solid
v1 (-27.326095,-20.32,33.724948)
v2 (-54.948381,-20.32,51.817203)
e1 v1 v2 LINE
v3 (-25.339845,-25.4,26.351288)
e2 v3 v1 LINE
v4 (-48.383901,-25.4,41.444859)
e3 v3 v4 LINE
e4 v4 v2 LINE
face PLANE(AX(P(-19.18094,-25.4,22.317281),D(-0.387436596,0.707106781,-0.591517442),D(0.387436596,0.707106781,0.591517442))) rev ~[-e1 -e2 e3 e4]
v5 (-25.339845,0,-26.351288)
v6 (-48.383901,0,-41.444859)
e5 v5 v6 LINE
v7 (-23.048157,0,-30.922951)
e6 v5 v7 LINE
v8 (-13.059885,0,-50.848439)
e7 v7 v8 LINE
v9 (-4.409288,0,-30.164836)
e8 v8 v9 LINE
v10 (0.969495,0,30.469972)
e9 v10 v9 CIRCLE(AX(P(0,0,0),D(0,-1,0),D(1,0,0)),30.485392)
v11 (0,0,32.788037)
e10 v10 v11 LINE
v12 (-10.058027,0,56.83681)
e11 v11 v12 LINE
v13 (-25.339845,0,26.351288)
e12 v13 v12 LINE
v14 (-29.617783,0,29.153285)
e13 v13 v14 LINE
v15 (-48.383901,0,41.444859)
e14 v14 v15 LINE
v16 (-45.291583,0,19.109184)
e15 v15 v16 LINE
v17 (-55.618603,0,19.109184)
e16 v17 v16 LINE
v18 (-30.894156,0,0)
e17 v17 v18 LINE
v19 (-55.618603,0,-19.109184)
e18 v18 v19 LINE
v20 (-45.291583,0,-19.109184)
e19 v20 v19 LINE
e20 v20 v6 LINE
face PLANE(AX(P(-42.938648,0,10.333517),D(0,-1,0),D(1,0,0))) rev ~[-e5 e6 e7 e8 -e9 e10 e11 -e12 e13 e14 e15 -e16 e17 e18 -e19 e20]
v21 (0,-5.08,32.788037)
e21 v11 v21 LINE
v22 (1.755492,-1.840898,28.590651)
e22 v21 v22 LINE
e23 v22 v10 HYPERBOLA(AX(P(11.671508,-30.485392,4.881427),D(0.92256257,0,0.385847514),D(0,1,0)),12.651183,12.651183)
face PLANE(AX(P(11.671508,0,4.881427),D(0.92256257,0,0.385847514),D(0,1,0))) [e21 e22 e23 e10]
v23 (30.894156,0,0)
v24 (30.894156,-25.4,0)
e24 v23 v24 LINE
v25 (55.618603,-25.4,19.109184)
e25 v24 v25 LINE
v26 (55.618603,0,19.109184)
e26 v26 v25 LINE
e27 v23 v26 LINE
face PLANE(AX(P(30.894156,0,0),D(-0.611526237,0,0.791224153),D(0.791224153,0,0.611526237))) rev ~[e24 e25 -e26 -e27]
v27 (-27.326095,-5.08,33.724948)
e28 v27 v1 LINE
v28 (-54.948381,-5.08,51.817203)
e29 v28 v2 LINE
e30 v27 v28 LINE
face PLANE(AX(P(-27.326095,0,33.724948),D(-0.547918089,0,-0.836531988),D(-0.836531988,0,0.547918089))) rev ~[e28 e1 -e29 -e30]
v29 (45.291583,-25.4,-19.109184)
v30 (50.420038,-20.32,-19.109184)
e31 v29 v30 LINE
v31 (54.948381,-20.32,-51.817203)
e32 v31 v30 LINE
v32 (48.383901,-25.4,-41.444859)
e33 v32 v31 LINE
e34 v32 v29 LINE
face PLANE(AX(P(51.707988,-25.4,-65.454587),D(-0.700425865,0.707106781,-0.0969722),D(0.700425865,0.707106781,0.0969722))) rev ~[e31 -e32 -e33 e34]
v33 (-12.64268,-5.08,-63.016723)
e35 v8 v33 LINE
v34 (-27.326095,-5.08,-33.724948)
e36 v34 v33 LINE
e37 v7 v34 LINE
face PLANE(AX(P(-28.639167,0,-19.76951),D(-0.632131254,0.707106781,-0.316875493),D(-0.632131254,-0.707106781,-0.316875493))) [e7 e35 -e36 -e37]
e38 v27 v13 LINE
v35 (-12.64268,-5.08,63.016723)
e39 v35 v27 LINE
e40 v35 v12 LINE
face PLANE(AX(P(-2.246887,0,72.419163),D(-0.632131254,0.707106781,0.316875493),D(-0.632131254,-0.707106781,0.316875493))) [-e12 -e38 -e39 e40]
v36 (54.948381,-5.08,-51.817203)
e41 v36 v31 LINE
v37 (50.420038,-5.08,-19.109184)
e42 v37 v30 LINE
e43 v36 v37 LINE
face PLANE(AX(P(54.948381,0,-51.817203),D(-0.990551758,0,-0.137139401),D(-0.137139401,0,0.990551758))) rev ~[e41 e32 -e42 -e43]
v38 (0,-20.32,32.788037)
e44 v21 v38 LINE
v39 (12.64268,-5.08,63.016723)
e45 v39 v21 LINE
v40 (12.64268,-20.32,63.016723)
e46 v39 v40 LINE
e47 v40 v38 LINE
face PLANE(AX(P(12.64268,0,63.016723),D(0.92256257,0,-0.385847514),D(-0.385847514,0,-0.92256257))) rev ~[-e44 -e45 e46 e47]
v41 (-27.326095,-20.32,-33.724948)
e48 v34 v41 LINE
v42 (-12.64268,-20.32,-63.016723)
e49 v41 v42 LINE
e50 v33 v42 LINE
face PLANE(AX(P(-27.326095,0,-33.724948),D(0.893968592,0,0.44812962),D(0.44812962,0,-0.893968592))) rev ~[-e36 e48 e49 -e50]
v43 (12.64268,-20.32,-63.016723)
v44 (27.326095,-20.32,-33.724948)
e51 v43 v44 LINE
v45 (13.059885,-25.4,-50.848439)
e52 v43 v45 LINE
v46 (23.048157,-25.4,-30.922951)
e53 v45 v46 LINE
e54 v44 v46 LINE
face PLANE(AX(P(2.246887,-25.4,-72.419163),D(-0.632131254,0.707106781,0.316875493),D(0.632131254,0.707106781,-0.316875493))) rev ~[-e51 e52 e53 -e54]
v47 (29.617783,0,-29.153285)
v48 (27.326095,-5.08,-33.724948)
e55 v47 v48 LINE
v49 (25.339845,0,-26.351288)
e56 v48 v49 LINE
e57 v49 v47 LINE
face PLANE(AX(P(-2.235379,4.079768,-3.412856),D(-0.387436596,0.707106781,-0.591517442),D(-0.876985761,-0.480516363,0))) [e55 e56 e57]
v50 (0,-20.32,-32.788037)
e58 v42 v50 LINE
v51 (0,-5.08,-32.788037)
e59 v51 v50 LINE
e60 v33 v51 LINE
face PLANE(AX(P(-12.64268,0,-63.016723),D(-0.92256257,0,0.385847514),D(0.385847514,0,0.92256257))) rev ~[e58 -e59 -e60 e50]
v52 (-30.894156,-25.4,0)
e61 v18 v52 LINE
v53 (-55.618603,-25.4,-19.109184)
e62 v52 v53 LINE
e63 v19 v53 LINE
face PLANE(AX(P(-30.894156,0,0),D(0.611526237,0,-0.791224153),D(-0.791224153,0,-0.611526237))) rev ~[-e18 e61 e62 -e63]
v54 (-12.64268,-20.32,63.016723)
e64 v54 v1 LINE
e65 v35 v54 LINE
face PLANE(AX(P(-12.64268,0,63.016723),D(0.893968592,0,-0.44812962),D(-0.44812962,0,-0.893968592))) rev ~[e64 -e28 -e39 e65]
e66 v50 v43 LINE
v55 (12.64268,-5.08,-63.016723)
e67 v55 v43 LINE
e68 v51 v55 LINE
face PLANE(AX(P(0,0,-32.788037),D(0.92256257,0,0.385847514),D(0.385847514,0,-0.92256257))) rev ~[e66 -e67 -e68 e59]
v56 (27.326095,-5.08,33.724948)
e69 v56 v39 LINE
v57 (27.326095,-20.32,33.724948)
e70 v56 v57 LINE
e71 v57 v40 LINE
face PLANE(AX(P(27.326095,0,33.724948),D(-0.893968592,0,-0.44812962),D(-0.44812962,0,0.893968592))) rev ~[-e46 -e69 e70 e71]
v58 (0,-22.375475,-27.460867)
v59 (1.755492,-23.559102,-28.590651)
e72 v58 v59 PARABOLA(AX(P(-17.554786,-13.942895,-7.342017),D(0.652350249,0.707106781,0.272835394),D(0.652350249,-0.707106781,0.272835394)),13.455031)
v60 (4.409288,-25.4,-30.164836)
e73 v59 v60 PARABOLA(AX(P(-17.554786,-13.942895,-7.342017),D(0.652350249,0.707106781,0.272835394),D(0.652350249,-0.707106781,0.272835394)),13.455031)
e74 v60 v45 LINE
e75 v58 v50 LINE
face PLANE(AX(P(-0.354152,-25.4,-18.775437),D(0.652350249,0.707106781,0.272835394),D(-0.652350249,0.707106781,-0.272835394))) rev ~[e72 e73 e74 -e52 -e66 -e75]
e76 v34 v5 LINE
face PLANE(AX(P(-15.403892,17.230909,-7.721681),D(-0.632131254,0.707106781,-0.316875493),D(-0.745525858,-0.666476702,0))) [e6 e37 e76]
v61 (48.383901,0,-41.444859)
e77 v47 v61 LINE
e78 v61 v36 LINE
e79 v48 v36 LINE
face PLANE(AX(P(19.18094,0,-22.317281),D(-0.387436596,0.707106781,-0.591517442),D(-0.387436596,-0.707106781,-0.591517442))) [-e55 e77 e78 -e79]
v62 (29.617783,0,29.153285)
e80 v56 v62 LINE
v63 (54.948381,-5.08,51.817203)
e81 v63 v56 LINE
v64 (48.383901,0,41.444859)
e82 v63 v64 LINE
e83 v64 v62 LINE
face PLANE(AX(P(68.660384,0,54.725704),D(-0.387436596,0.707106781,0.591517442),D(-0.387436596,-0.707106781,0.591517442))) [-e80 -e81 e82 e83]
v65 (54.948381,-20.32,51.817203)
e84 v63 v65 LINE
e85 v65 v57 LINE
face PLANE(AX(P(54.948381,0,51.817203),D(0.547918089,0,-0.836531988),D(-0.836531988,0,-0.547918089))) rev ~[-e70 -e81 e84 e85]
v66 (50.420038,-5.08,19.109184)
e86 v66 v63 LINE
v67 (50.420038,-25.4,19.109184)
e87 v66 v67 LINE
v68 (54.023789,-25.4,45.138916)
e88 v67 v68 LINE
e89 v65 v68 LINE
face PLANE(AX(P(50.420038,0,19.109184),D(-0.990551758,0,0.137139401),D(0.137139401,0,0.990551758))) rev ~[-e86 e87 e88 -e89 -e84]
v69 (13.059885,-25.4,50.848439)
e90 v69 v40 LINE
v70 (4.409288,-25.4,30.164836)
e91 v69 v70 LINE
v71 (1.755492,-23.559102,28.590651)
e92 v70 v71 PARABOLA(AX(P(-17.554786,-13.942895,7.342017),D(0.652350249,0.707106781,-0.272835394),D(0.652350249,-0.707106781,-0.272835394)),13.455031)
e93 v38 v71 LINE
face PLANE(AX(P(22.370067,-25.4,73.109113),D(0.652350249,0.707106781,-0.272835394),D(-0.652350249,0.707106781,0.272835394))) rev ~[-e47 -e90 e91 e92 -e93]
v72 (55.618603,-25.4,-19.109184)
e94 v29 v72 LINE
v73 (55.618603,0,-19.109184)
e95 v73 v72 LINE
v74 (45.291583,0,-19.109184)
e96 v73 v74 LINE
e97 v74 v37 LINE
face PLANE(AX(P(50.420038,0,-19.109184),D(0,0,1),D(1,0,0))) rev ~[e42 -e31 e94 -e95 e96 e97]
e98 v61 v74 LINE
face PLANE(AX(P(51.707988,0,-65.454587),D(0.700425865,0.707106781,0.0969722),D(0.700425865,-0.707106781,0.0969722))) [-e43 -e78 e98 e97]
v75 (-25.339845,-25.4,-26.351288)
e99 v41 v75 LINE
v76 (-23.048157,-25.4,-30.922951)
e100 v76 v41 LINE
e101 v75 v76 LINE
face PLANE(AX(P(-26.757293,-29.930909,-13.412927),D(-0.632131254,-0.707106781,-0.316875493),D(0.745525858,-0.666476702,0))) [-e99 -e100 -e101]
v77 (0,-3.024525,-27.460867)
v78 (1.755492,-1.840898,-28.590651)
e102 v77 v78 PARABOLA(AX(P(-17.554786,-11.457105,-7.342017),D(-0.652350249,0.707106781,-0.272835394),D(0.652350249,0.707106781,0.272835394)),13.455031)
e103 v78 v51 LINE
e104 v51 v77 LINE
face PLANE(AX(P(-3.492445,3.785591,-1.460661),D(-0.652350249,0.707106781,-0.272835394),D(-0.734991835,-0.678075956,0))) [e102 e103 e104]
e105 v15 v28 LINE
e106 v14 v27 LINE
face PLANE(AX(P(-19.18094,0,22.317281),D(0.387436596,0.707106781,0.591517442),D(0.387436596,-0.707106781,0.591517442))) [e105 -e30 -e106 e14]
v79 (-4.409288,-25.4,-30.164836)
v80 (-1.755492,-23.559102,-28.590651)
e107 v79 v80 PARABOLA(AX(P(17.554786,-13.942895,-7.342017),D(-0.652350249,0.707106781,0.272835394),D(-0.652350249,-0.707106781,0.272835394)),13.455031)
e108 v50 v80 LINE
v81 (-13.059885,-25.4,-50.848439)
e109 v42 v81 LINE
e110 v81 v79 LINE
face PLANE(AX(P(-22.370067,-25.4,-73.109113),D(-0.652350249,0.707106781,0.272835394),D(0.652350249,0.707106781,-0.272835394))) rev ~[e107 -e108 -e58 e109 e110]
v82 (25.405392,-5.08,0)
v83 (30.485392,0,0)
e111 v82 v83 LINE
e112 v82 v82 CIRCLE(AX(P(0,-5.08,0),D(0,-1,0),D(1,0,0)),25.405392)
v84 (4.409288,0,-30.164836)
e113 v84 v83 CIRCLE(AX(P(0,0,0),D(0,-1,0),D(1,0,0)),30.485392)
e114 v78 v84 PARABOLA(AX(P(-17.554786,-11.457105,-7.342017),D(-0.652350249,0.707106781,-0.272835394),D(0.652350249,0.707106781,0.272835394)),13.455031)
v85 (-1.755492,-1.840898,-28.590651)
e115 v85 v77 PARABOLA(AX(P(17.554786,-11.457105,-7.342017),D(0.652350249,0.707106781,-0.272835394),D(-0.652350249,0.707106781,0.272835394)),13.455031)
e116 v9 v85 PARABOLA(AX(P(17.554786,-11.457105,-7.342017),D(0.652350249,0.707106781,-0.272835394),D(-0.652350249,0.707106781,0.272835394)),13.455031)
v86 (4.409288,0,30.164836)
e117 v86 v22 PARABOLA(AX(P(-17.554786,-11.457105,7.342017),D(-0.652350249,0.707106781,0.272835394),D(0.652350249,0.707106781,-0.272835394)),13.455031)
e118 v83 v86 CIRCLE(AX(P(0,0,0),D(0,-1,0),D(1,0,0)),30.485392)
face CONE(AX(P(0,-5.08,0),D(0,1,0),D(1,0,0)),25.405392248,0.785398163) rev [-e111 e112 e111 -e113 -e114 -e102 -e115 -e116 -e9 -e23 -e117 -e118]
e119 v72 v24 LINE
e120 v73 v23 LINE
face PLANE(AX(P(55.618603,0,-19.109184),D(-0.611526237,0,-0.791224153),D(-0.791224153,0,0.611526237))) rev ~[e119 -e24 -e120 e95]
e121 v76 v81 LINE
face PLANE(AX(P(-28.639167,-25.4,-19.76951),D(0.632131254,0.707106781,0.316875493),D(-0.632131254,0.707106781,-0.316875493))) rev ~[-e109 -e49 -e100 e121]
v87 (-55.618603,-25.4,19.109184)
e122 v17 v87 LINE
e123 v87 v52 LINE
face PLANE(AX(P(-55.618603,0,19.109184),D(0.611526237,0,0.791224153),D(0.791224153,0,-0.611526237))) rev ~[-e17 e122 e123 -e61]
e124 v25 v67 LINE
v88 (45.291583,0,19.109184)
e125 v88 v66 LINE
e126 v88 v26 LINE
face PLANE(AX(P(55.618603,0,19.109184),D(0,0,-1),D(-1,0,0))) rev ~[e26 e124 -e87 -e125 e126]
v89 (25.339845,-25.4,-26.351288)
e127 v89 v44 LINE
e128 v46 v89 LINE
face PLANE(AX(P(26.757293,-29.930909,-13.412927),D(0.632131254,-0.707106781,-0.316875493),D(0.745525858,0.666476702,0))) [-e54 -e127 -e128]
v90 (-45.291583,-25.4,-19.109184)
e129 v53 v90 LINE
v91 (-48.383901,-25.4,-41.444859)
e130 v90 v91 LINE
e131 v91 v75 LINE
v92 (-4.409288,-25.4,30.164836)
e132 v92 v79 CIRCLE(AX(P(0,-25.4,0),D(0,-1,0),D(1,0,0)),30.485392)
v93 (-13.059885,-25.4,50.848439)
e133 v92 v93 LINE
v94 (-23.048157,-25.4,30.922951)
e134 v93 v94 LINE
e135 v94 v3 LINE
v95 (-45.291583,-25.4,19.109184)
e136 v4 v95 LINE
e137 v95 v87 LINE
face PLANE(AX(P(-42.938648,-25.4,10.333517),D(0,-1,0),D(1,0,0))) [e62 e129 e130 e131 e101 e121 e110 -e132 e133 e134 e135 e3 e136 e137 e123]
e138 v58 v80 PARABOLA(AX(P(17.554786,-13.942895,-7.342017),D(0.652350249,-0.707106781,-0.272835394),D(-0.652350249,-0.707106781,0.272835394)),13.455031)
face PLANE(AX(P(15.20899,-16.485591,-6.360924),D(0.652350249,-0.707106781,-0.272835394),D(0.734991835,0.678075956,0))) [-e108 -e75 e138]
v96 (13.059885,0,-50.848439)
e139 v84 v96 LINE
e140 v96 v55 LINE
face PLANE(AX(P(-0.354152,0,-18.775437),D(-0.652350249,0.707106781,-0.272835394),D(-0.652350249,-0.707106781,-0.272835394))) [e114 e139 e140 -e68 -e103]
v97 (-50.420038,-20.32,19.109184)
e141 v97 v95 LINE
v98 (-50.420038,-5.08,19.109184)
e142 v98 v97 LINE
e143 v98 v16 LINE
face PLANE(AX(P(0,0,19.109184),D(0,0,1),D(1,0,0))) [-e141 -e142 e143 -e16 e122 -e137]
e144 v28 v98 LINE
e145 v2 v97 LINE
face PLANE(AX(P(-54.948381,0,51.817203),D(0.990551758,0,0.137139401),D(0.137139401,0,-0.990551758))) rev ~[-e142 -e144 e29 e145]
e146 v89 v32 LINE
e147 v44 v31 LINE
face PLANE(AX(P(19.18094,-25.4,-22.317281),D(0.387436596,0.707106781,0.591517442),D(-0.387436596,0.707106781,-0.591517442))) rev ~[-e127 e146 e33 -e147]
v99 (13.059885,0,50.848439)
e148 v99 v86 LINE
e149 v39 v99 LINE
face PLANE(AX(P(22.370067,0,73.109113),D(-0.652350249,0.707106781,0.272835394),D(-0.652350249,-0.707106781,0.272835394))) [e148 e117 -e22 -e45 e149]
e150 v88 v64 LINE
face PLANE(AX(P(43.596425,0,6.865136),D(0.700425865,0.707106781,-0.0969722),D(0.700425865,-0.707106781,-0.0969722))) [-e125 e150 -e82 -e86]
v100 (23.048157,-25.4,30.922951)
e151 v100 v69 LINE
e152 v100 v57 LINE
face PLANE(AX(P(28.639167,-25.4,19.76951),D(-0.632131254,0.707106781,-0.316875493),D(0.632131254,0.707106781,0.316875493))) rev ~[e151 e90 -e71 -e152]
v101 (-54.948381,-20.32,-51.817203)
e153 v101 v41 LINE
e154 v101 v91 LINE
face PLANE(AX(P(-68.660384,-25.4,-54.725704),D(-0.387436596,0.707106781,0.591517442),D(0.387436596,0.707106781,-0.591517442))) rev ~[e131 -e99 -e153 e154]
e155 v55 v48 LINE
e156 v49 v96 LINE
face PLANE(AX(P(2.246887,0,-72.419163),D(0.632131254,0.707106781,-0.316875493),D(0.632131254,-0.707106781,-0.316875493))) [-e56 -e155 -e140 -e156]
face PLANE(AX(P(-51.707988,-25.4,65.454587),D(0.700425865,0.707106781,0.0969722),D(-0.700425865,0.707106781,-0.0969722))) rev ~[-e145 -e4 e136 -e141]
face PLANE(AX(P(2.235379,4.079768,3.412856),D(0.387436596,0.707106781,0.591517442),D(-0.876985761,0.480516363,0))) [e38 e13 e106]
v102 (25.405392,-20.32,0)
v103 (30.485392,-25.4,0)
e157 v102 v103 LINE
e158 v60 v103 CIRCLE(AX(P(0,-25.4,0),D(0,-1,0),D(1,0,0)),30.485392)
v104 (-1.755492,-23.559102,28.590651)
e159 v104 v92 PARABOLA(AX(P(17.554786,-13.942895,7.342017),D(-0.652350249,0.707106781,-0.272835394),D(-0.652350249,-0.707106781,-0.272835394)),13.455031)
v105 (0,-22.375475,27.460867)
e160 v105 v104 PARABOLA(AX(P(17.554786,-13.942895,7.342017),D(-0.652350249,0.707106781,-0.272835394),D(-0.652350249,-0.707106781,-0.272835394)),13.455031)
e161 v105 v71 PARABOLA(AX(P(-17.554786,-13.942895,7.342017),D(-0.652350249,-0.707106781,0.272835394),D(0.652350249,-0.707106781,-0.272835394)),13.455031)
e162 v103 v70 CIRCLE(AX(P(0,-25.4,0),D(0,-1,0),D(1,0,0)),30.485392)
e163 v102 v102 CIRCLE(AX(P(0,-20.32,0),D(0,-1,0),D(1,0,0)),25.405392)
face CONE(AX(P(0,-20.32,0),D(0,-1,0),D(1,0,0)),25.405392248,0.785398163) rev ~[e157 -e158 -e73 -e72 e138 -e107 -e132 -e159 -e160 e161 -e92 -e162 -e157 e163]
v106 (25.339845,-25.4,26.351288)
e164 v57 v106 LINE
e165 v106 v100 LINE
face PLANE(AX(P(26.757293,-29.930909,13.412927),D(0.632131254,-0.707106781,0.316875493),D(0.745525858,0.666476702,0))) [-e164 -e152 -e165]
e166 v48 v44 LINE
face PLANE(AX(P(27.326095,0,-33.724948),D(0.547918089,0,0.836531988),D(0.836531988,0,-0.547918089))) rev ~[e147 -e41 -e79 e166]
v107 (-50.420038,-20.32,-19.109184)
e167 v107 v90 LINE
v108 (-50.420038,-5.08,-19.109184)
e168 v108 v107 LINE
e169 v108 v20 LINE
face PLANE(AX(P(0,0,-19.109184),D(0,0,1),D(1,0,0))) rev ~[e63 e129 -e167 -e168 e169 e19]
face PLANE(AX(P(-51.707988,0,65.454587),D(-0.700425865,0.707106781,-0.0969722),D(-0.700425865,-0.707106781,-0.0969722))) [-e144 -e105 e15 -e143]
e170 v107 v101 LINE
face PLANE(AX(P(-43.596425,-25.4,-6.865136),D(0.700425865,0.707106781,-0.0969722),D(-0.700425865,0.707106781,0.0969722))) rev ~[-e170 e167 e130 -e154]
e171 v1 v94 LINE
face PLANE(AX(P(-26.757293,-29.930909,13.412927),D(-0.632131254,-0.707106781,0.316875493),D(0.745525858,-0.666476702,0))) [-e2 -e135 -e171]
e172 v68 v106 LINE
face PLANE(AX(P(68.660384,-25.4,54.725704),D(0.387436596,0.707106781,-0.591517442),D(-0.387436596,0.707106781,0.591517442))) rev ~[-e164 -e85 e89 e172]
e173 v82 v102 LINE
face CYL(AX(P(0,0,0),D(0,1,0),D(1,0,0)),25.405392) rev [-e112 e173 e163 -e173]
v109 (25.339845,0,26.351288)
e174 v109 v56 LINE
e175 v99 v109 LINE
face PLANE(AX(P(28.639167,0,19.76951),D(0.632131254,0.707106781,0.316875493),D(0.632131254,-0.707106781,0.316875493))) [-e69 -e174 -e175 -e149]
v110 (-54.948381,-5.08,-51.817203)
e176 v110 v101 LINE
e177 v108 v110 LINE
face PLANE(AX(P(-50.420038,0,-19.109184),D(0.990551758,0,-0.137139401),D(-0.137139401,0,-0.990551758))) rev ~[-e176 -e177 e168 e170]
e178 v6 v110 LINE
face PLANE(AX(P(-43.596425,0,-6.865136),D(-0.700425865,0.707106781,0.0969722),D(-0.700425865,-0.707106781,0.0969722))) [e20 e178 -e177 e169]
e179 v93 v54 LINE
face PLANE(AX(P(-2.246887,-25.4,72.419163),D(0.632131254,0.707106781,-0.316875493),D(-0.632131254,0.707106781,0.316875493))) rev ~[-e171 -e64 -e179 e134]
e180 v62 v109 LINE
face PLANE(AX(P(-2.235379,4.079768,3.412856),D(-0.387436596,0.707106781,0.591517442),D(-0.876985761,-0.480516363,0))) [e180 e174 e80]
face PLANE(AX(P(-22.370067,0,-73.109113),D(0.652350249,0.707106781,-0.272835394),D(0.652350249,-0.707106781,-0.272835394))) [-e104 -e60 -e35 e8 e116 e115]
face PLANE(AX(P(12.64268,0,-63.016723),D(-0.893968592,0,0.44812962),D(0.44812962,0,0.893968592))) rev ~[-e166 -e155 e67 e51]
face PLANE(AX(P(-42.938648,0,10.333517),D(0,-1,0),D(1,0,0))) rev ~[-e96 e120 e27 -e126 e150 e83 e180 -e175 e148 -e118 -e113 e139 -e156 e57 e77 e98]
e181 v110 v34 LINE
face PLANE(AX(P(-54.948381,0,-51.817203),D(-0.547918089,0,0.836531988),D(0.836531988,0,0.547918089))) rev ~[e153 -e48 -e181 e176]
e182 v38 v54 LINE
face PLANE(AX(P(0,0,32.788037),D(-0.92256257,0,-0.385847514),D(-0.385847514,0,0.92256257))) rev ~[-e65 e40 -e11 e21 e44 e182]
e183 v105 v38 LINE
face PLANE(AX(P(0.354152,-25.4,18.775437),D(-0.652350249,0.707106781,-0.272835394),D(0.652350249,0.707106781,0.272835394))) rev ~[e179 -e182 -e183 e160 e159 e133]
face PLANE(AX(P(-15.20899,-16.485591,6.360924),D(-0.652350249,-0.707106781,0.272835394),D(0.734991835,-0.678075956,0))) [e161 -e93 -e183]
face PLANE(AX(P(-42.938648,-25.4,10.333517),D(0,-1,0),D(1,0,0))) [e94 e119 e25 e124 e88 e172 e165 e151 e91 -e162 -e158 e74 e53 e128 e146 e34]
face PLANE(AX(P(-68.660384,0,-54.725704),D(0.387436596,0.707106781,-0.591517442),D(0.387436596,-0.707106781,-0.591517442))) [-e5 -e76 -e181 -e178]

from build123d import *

# Parameters (mm, degrees)
F0_R          = 25.4053922475
F1_DEPTH      = 25.4
F2_SIZE       = 5.08
F3_T4_DEPTH   = 58.8942991577
F3_T9_DEPTH   = 59.1482991577
F3_T14_DEPTH  = 59.1482991577
F3_T19_DEPTH  = 59.1482991577
F3_T24_DEPTH  = 59.1482991577
F3_T29_DEPTH  = 58.8942991577
F3_T34_DEPTH  = 58.8942991577
F3_T39_DEPTH  = 58.8942991577
F3_T44_DEPTH  = 58.8942991577
F3_T49_DEPTH  = 59.1482991577
F3_T54_DEPTH  = 59.1482991577
F3_T59_DEPTH  = 58.8942991577
F3_T64_DEPTH  = 58.8942991577
F3_T69_DEPTH  = 59.1482991577
F3_T74_DEPTH  = 59.1482991577
F3_T79_DEPTH  = 59.1482991577
F3_T84_DEPTH  = 59.1482991577
F3_T89_DEPTH  = 58.8942991577
F3_T94_DEPTH  = 58.8942991577
F3_T99_DEPTH  = 58.8942991577
F3_T104_DEPTH = 59.1482991577
F3_T109_DEPTH = 59.1482991577
F3_T114_DEPTH = 59.1482991577
F3_T119_DEPTH = 58.8942991577
F3_T124_DEPTH = 59.1482991577
F3_T129_DEPTH = 59.1482991577
F3_T134_DEPTH = 58.8942991577
F3_T139_DEPTH = 58.8942991577
F3_T144_DEPTH = 58.8942991577
F3_T149_DEPTH = 58.8942991577


# Not quite as in the source:
# - a fillet or chamfer that OpenCascade refuses, or shapes differently, is made with other operations: its cross-section is extruded or revolved along the edge and cut away or added


with BuildPart() as f1:
    # F0 (on Front) → F1 (new body)
    with BuildSketch(Plane.XZ):
        Polygon((-55.6186027825, 19.1091839224), (-30.8941560641, 0), (-50.4200380058, 19.1091839224), align=None)
        Polygon((-54.9483810148, 51.8172029635), (-50.4200380058, 19.1091839224), (-27.3260947604, 33.7249476569), align=None)
        Polygon((-12.64267964, 63.0167225502), (-27.3260947604, 33.7249476569), (0, 32.7880373733), align=None)
        Polygon((12.64267964, 63.0167225502), (0, 32.7880373733), (27.3260947604, 33.7249476569), align=None)
        Polygon((54.9483810148, 51.8172029635), (27.3260947604, 33.7249476569), (50.4200380058, 19.1091839224), align=None)
        Polygon((55.6186027825, 19.1091839224), (50.4200380058, 19.1091839224), (30.8941560641, 0), align=None)
        Polygon((0, -32.7880373733), (-27.3260947604, -33.7249476569), (-12.64267964, -63.0167225502), align=None)
        Polygon((-27.3260947604, -33.7249476569), (-50.4200380058, -19.1091839224), (-54.9483810148, -51.8172029635), align=None)
        Polygon((-50.4200380058, -19.1091839224), (-30.8941560641, 0), (-55.6186027825, -19.1091839224), align=None)
        Polygon((27.3260947604, -33.7249476569), (0, -32.7880373733), (12.64267964, -63.0167225502), align=None)
        Polygon((50.4200380058, -19.1091839224), (27.3260947604, -33.7249476569), (54.9483810148, -51.8172029635), align=None)
        Polygon((30.8941560641, 0), (50.4200380058, -19.1091839224), (55.6186027825, -19.1091839224), align=None)
        Polygon((-50.4200380058, 19.1091839224), (-30.8941560641, 0), (-50.4200380058, -19.1091839224), (-27.3260947604, -33.7249476569), (0, -32.7880373733), (27.3260947604, -33.7249476569), (50.4200380058, -19.1091839224), (30.8941560641, 0), (50.4200380058, 19.1091839224), (27.3260947604, 33.7249476569), (0, 32.7880373733), (-27.3260947604, 33.7249476569), align=None)
        Circle(F0_R, mode=Mode.SUBTRACT)
    extrude(amount=F1_DEPTH)

    # F2
    f2_edges = [f1.edges().sort_by_distance(p)[0] for p in [
        (-25.405392, 0, 0),
        (-25.405392, -25.4, 0),
    ]]
    chamfer(f2_edges, length=F2_SIZE)

    # F3: chamfer of 5.08 on 30 edges, made by hand


with BuildPart() as f3_tool2:
    # F3_s3 → F3_t4 (new body)
    with BuildSketch(Plane(origin=(28.5608965027, 0, 56.9758018995), x_dir=(0, 1, 0), z_dir=(-0.4481296197, 0, -0.8939685922))):
        Polygon((0, -34.4618184336), (-5.08, -39.5418184336), (0, -39.5418184336), align=None)
    extrude(amount=F3_T4_DEPTH)

    split(bisect_by=Plane(origin=(2.2353786575, 4.079767946, 3.4128563917), x_dir=(-0.8769857612, 0.4805163626, 0), z_dir=(0.3874365964, 0.7071067812, 0.5915174416)), keep=Keep.TOP)


with BuildPart() as f1_1:
    add(f1.part)

    # F3_t1: cut F3_tool2
    add(f3_tool2.part, mode=Mode.SUBTRACT)


with BuildPart() as f3_tool7:
    # F3_s8 → F3_t9 (new body)
    with BuildSketch(Plane(origin=(-23.6516969458, 0, 15.4915684979), x_dir=(0, 1, 0), z_dir=(-0.8365319883, 0, 0.5479180892))):
        Polygon((0, -8.159535892), (-5.08, -13.239535892), (0, -13.239535892), align=None)
    extrude(amount=F3_T9_DEPTH)

    split(bisect_by=Plane(origin=(-15.4038916556, 17.2309092168, 7.7216807951), x_dir=(-0.7455258584, -0.6664767021, 0), z_dir=(-0.6321312537, 0.7071067812, 0.316875493)), keep=Keep.TOP)


with BuildPart() as f1_2:
    add(f1_1.part)

    # F3_t6: cut F3_tool7
    add(f3_tool7.part, mode=Mode.SUBTRACT)


with BuildPart() as f3_tool12:
    # F3_s13 → F3_t14 (new body)
    with BuildSketch(Plane(origin=(-9.8640749157, 0, 71.247771982), x_dir=(0, 1, 0), z_dir=(0.1371394006, 0, -0.9905517578))):
        Polygon((0, -42.2430352429), (-5.08, -47.3230352429), (0, -47.3230352429), align=None)
    extrude(amount=F3_T14_DEPTH)

    split(bisect_by=Plane.XY.offset(19.1091839224), keep=Keep.TOP)


with BuildPart() as f1_3:
    add(f1_2.part)

    # F3_t11: cut F3_tool12
    add(f3_tool12.part, mode=Mode.SUBTRACT)


with BuildPart() as f3_tool17:
    # F3_s18 → F3_t19 (new body)
    with BuildSketch(Plane(origin=(-1.7525126205, 0, -12.658320283), x_dir=(0, 1, 0), z_dir=(-0.1371394006, 0, -0.9905517578))):
        Polygon((0, -42.2430352429), (-5.08, -47.3230352429), (0, -47.3230352429), align=None)
    extrude(amount=F3_T19_DEPTH)

    split(bisect_by=Plane.XY.offset(-19.1091839224), keep=Keep.BOTTOM)


with BuildPart() as f1_4:
    add(f1_3.part)

    # F3_t16: cut F3_tool17
    add(f3_tool17.part, mode=Mode.SUBTRACT)


with BuildPart() as f3_tool22:
    # F3_s23 → F3_t24 (new body)
    with BuildSketch(Plane(origin=(-73.1311412461, 0, -47.8999915541), x_dir=(0, 1, 0), z_dir=(0.8365319883, 0, 0.5479180892))):
        Polygon((0, -8.159535892), (-5.08, -13.239535892), (0, -13.239535892), align=None)
    extrude(amount=F3_T24_DEPTH)

    split(bisect_by=Plane(origin=(-15.4038916556, 17.2309092168, -7.7216807951), x_dir=(-0.7455258584, -0.6664767021, 0), z_dir=(-0.6321312537, 0.7071067812, -0.316875493)), keep=Keep.TOP)


with BuildPart() as f1_5:
    add(f1_4.part)

    # F3_t21: cut F3_tool22
    add(f3_tool22.part, mode=Mode.SUBTRACT)


with BuildPart() as f3_tool27:
    # F3_s28 → F3_t29 (new body)
    with BuildSketch(Plane(origin=(2.1686166163, 0, -4.3261481905), x_dir=(0, 1, 0), z_dir=(0.4481296197, 0, -0.8939685922))):
        Polygon((0, -34.4618184336), (-5.08, -39.5418184336), (0, -39.5418184336), align=None)
    extrude(amount=F3_T29_DEPTH)

    split(bisect_by=Plane(origin=(2.2353786575, 4.079767946, -3.4128563917), x_dir=(-0.8769857612, 0.4805163626, 0), z_dir=(0.3874365964, 0.7071067812, -0.5915174416)), keep=Keep.TOP)


with BuildPart() as f1_6:
    add(f1_5.part)

    # F3_t26: cut F3_tool27
    add(f3_tool27.part, mode=Mode.SUBTRACT)


with BuildPart() as f3_tool32:
    # F3_s33 → F3_t34 (new body)
    with BuildSketch(Plane(origin=(-29.3549569097, 0, -70.1877905691), x_dir=(0, 1, 0), z_dir=(0.3858475139, 0, 0.9225625703))):
        Polygon((0, -7.5711827057), (-5.08, -12.6511827057), (0, -12.6511827057), align=None)
    extrude(amount=F3_T34_DEPTH)

    split(bisect_by=Plane(origin=(-3.4924448884, 3.7855913528, -1.4606610121), x_dir=(-0.7349918349, -0.6780759564, 0), z_dir=(-0.6523502495, 0.7071067812, -0.2728353936)), keep=Keep.TOP)


with BuildPart() as f1_7:
    add(f1_6.part)

    # F3_t31: cut F3_tool32
    add(f3_tool32.part, mode=Mode.SUBTRACT)


with BuildPart() as f3_tool37:
    # F3_s38 → F3_t39 (new body)
    with BuildSketch(Plane(origin=(6.6307379976, 0, -15.854114565), x_dir=(0, 1, 0), z_dir=(0.3858475139, 0, -0.9225625703))):
        Polygon((0, -7.5711827057), (-5.08, -12.6511827057), (0, -12.6511827057), align=None)
    extrude(amount=F3_T39_DEPTH)

    split(bisect_by=Plane(origin=(3.4924448884, 3.7855913528, -1.4606610121), x_dir=(-0.7349918349, 0.6780759564, 0), z_dir=(0.6523502495, 0.7071067812, -0.2728353936)), keep=Keep.TOP)


with BuildPart() as f1_8:
    add(f1_7.part)

    # F3_t36: cut F3_tool37
    add(f3_tool37.part, mode=Mode.SUBTRACT)


with BuildPart() as f3_tool42:
    # F3_s43 → F3_t44 (new body)
    with BuildSketch(Plane(origin=(-28.5608965027, 0, -56.9758018995), x_dir=(0, 1, 0), z_dir=(0.4481296197, 0, 0.8939685922))):
        Polygon((0, -34.4618184336), (-5.08, -39.5418184336), (0, -39.5418184336), align=None)
    extrude(amount=F3_T44_DEPTH)

    split(bisect_by=Plane(origin=(-2.2353786575, 4.079767946, -3.4128563917), x_dir=(-0.8769857612, -0.4805163626, 0), z_dir=(-0.3874365964, 0.7071067812, -0.5915174416)), keep=Keep.TOP)


with BuildPart() as f1_9:
    add(f1_8.part)

    # F3_t41: cut F3_tool42
    add(f3_tool42.part, mode=Mode.SUBTRACT)


with BuildPart() as f3_tool47:
    # F3_s48 → F3_t49 (new body)
    with BuildSketch(Plane(origin=(23.6516969458, 0, -15.4915684979), x_dir=(0, 1, 0), z_dir=(0.8365319883, 0, -0.5479180892))):
        Polygon((0, -8.159535892), (-5.08, -13.239535892), (0, -13.239535892), align=None)
    extrude(amount=F3_T49_DEPTH)

    split(bisect_by=Plane(origin=(15.4038916556, 17.2309092168, -7.7216807951), x_dir=(-0.7455258584, 0.6664767021, 0), z_dir=(0.6321312537, 0.7071067812, -0.316875493)), keep=Keep.TOP)


with BuildPart() as f1_10:
    add(f1_9.part)

    # F3_t46: cut F3_tool47
    add(f3_tool47.part, mode=Mode.SUBTRACT)


with BuildPart() as f3_tool52:
    # F3_s53 → F3_t54 (new body)
    with BuildSketch(Plane(origin=(9.8640749157, 0, -71.247771982), x_dir=(0, 1, 0), z_dir=(-0.1371394006, 0, 0.9905517578))):
        Polygon((0, -42.2430352429), (-5.08, -47.3230352429), (0, -47.3230352429), align=None)
    extrude(amount=F3_T54_DEPTH)

    split(bisect_by=Plane.XY.offset(-19.1091839224), keep=Keep.BOTTOM)


with BuildPart() as f1_11:
    add(f1_10.part)

    # F3_t51: cut F3_tool52
    add(f3_tool52.part, mode=Mode.SUBTRACT)


with BuildPart() as f3_tool57:
    # F3_s58 → F3_t59 (new body)
    with BuildSketch(Plane(origin=(29.3549569097, 0, 70.1877905691), x_dir=(0, 1, 0), z_dir=(-0.3858475139, 0, -0.9225625703))):
        Polygon((0, -7.5711827057), (-5.08, -12.6511827057), (0, -12.6511827057), align=None)
    extrude(amount=F3_T59_DEPTH)

    split(bisect_by=Plane(origin=(11.6715076337, 0, 4.8814273947), x_dir=(0, 1, 0), z_dir=(0.9225625703, 0, 0.3858475139)), keep=Keep.TOP)


with BuildPart() as f1_12:
    add(f1_11.part)

    # F3_t56: cut F3_tool57
    add(f3_tool57.part, mode=Mode.SUBTRACT)


with BuildPart() as f3_tool62:
    # F3_s63 → F3_t64 (new body)
    with BuildSketch(Plane(origin=(-2.1686166163, 0, 4.3261481905), x_dir=(0, 1, 0), z_dir=(-0.4481296197, 0, 0.8939685922))):
        Polygon((0, -34.4618184336), (-5.08, -39.5418184336), (0, -39.5418184336), align=None)
    extrude(amount=F3_T64_DEPTH)

    split(bisect_by=Plane(origin=(-2.2353786575, 4.079767946, 3.4128563917), x_dir=(-0.8769857612, -0.4805163626, 0), z_dir=(-0.3874365964, 0.7071067812, 0.5915174416)), keep=Keep.TOP)


with BuildPart() as f1_13:
    add(f1_12.part)

    # F3_t61: cut F3_tool62
    add(f3_tool62.part, mode=Mode.SUBTRACT)


with BuildPart() as f3_tool67:
    # F3_s68 → F3_t69 (new body)
    with BuildSketch(Plane(origin=(73.1311412461, 0, 47.8999915541), x_dir=(0, 1, 0), z_dir=(-0.8365319883, 0, -0.5479180892))):
        Polygon((0, -8.159535892), (-5.08, -13.239535892), (0, -13.239535892), align=None)
    extrude(amount=F3_T69_DEPTH)

    split(bisect_by=Plane(origin=(15.4038916556, 17.2309092168, 7.7216807951), x_dir=(-0.7455258584, 0.6664767021, 0), z_dir=(0.6321312537, 0.7071067812, 0.316875493)), keep=Keep.TOP)


with BuildPart() as f1_14:
    add(f1_13.part)

    # F3_t66: cut F3_tool67
    add(f3_tool67.part, mode=Mode.SUBTRACT)


with BuildPart() as f3_tool72:
    # F3_s73 → F3_t74 (new body)
    with BuildSketch(Plane(origin=(1.7525126205, 0, 12.658320283), x_dir=(0, 1, 0), z_dir=(0.1371394006, 0, 0.9905517578))):
        Polygon((0, -42.2430352429), (-5.08, -47.3230352429), (0, -47.3230352429), align=None)
    extrude(amount=F3_T74_DEPTH)

    split(bisect_by=Plane.XY.offset(19.1091839224), keep=Keep.TOP)


with BuildPart() as f1_15:
    add(f1_14.part)

    # F3_t71: cut F3_tool72
    add(f3_tool72.part, mode=Mode.SUBTRACT)


with BuildPart() as f3_tool77:
    # F3_s78 → F3_t79 (new body)
    with BuildSketch(Plane(origin=(-9.8640749157, 0, 71.247771982), x_dir=(0, 1, 0), z_dir=(0.1371394006, 0, -0.9905517578))):
        Polygon((-25.4, -42.2430352429), (-20.32, -47.3230352429), (-25.4, -47.3230352429), align=None)
    extrude(amount=F3_T79_DEPTH)

    split(bisect_by=Plane.XY.offset(19.1091839224), keep=Keep.TOP)


with BuildPart() as f1_16:
    add(f1_15.part)

    # F3_t76: cut F3_tool77
    add(f3_tool77.part, mode=Mode.SUBTRACT)


with BuildPart() as f3_tool82:
    # F3_s83 → F3_t84 (new body)
    with BuildSketch(Plane(origin=(-23.6516969458, 0, 15.4915684979), x_dir=(0, 1, 0), z_dir=(-0.8365319883, 0, 0.5479180892))):
        Polygon((-25.4, -8.159535892), (-20.32, -13.239535892), (-25.4, -13.239535892), align=None)
    extrude(amount=F3_T84_DEPTH)

    split(bisect_by=Plane(origin=(-26.757292777, -29.9309092168, 13.4129269658), x_dir=(0.7455258584, -0.6664767021, 0), z_dir=(-0.6321312537, -0.7071067812, 0.316875493)), keep=Keep.TOP)


with BuildPart() as f1_17:
    add(f1_16.part)

    # F3_t81: cut F3_tool82
    add(f3_tool82.part, mode=Mode.SUBTRACT)


with BuildPart() as f3_tool87:
    # F3_s88 → F3_t89 (new body)
    with BuildSketch(Plane(origin=(28.5608965027, 0, 56.9758018995), x_dir=(0, 1, 0), z_dir=(-0.4481296197, 0, -0.8939685922))):
        Polygon((-25.4, -34.4618184336), (-20.32, -39.5418184336), (-25.4, -39.5418184336), align=None)
    extrude(amount=F3_T89_DEPTH)

    split(bisect_by=Plane(origin=(9.1939383908, -16.779767946, 14.0368126434), x_dir=(0.8769857612, 0.4805163626, 0), z_dir=(0.3874365964, -0.7071067812, 0.5915174416)), keep=Keep.TOP)


with BuildPart() as f1_18:
    add(f1_17.part)

    # F3_t86: cut F3_tool87
    add(f3_tool87.part, mode=Mode.SUBTRACT)


with BuildPart() as f3_tool92:
    # F3_s93 → F3_t94 (new body)
    with BuildSketch(Plane(origin=(-6.6307379976, 0, 15.854114565), x_dir=(0, 1, 0), z_dir=(-0.3858475139, 0, 0.9225625703))):
        Polygon((-25.4, -7.5711827057), (-20.32, -12.6511827057), (-25.4, -12.6511827057), align=None)
    extrude(amount=F3_T94_DEPTH)

    split(bisect_by=Plane(origin=(-15.2089895306, -16.4855913528, 6.3609244384), x_dir=(0.7349918349, -0.6780759564, 0), z_dir=(-0.6523502495, -0.7071067812, 0.2728353936)), keep=Keep.TOP)


with BuildPart() as f1_19:
    add(f1_18.part)

    # F3_t91: cut F3_tool92
    add(f3_tool92.part, mode=Mode.SUBTRACT)


with BuildPart() as f3_tool97:
    # F3_s98 → F3_t99 (new body)
    with BuildSketch(Plane(origin=(29.3549569097, 0, 70.1877905691), x_dir=(0, 1, 0), z_dir=(-0.3858475139, 0, -0.9225625703))):
        Polygon((-25.4, -7.5711827057), (-20.32, -12.6511827057), (-25.4, -12.6511827057), align=None)
    extrude(amount=F3_T99_DEPTH)

    split(bisect_by=Plane(origin=(15.2089895306, -16.4855913528, 6.3609244384), x_dir=(0.7349918349, 0.6780759564, 0), z_dir=(0.6523502495, -0.7071067812, 0.2728353936)), keep=Keep.TOP)


with BuildPart() as f1_20:
    add(f1_19.part)

    # F3_t96: cut F3_tool97
    add(f3_tool97.part, mode=Mode.SUBTRACT)


with BuildPart() as f3_tool102:
    # F3_s103 → F3_t104 (new body)
    with BuildSketch(Plane(origin=(73.1311412461, 0, 47.8999915541), x_dir=(0, 1, 0), z_dir=(-0.8365319883, 0, -0.5479180892))):
        Polygon((-25.4, -8.159535892), (-20.32, -13.239535892), (-25.4, -13.239535892), align=None)
    extrude(amount=F3_T104_DEPTH)

    split(bisect_by=Plane(origin=(26.757292777, -29.9309092168, 13.4129269658), x_dir=(0.7455258584, 0.6664767021, 0), z_dir=(0.6321312537, -0.7071067812, 0.316875493)), keep=Keep.TOP)


with BuildPart() as f1_21:
    add(f1_20.part)

    # F3_t101: cut F3_tool102
    add(f3_tool102.part, mode=Mode.SUBTRACT)


with BuildPart() as f3_tool107:
    # F3_s108 → F3_t109 (new body)
    with BuildSketch(Plane(origin=(9.8640749157, 0, -71.247771982), x_dir=(0, 1, 0), z_dir=(-0.1371394006, 0, 0.9905517578))):
        Polygon((-25.4, -42.2430352429), (-20.32, -47.3230352429), (-25.4, -47.3230352429), align=None)
    extrude(amount=F3_T109_DEPTH)

    split(bisect_by=Plane.XY.offset(-19.1091839224), keep=Keep.BOTTOM)


with BuildPart() as f1_22:
    add(f1_21.part)

    # F3_t106: cut F3_tool107
    add(f3_tool107.part, mode=Mode.SUBTRACT)


with BuildPart() as f3_tool112:
    # F3_s113 → F3_t114 (new body)
    with BuildSketch(Plane(origin=(23.6516969458, 0, -15.4915684979), x_dir=(0, 1, 0), z_dir=(0.8365319883, 0, -0.5479180892))):
        Polygon((-25.4, -8.159535892), (-20.32, -13.239535892), (-25.4, -13.239535892), align=None)
    extrude(amount=F3_T114_DEPTH)

    split(bisect_by=Plane(origin=(26.757292777, -29.9309092168, -13.4129269658), x_dir=(0.7455258584, 0.6664767021, 0), z_dir=(0.6321312537, -0.7071067812, -0.316875493)), keep=Keep.TOP)


with BuildPart() as f1_23:
    add(f1_22.part)

    # F3_t111: cut F3_tool112
    add(f3_tool112.part, mode=Mode.SUBTRACT)


with BuildPart() as f3_tool117:
    # F3_s118 → F3_t119 (new body)
    with BuildSketch(Plane(origin=(-2.1686166163, 0, 4.3261481905), x_dir=(0, 1, 0), z_dir=(-0.4481296197, 0, 0.8939685922))):
        Polygon((-25.4, -34.4618184336), (-20.32, -39.5418184336), (-25.4, -39.5418184336), align=None)
    extrude(amount=F3_T119_DEPTH)

    split(bisect_by=Plane(origin=(-9.1939383908, -16.779767946, 14.0368126434), x_dir=(0.8769857612, -0.4805163626, 0), z_dir=(-0.3874365964, -0.7071067812, 0.5915174416)), keep=Keep.TOP)


with BuildPart() as f1_24:
    add(f1_23.part)

    # F3_t116: cut F3_tool117
    add(f3_tool117.part, mode=Mode.SUBTRACT)


with BuildPart() as f3_tool122:
    # F3_s123 → F3_t124 (new body)
    with BuildSketch(Plane(origin=(-1.7525126205, 0, -12.658320283), x_dir=(0, 1, 0), z_dir=(-0.1371394006, 0, -0.9905517578))):
        Polygon((-25.4, -42.2430352429), (-20.32, -47.3230352429), (-25.4, -47.3230352429), align=None)
    extrude(amount=F3_T124_DEPTH)

    split(bisect_by=Plane.XY.offset(-19.1091839224), keep=Keep.BOTTOM)


with BuildPart() as f1_25:
    add(f1_24.part)

    # F3_t121: cut F3_tool122
    add(f3_tool122.part, mode=Mode.SUBTRACT)


with BuildPart() as f3_tool127:
    # F3_s128 → F3_t129 (new body)
    with BuildSketch(Plane(origin=(-73.1311412461, 0, -47.8999915541), x_dir=(0, 1, 0), z_dir=(0.8365319883, 0, 0.5479180892))):
        Polygon((-25.4, -8.159535892), (-20.32, -13.239535892), (-25.4, -13.239535892), align=None)
    extrude(amount=F3_T129_DEPTH)

    split(bisect_by=Plane(origin=(-26.757292777, -29.9309092168, -13.4129269658), x_dir=(0.7455258584, -0.6664767021, 0), z_dir=(-0.6321312537, -0.7071067812, -0.316875493)), keep=Keep.TOP)


with BuildPart() as f1_26:
    add(f1_25.part)

    # F3_t126: cut F3_tool127
    add(f3_tool127.part, mode=Mode.SUBTRACT)


with BuildPart() as f3_tool132:
    # F3_s133 → F3_t134 (new body)
    with BuildSketch(Plane(origin=(2.1686166163, 0, -4.3261481905), x_dir=(0, 1, 0), z_dir=(0.4481296197, 0, -0.8939685922))):
        Polygon((-25.4, -34.4618184336), (-20.32, -39.5418184336), (-25.4, -39.5418184336), align=None)
    extrude(amount=F3_T134_DEPTH)

    split(bisect_by=Plane(origin=(9.1939383908, -16.779767946, -14.0368126434), x_dir=(0.8769857612, 0.4805163626, 0), z_dir=(0.3874365964, -0.7071067812, -0.5915174416)), keep=Keep.TOP)


with BuildPart() as f1_27:
    add(f1_26.part)

    # F3_t131: cut F3_tool132
    add(f3_tool132.part, mode=Mode.SUBTRACT)


with BuildPart() as f3_tool137:
    # F3_s138 → F3_t139 (new body)
    with BuildSketch(Plane(origin=(6.6307379976, 0, -15.854114565), x_dir=(0, 1, 0), z_dir=(0.3858475139, 0, -0.9225625703))):
        Polygon((-25.4, -7.5711827057), (-20.32, -12.6511827057), (-25.4, -12.6511827057), align=None)
    extrude(amount=F3_T139_DEPTH)

    split(bisect_by=Plane(origin=(15.2089895306, -16.4855913528, -6.3609244384), x_dir=(0.7349918349, 0.6780759564, 0), z_dir=(0.6523502495, -0.7071067812, -0.2728353936)), keep=Keep.TOP)


with BuildPart() as f1_28:
    add(f1_27.part)

    # F3_t136: cut F3_tool137
    add(f3_tool137.part, mode=Mode.SUBTRACT)


with BuildPart() as f3_tool142:
    # F3_s143 → F3_t144 (new body)
    with BuildSketch(Plane(origin=(-28.5608965027, 0, -56.9758018995), x_dir=(0, 1, 0), z_dir=(0.4481296197, 0, 0.8939685922))):
        Polygon((-25.4, -34.4618184336), (-20.32, -39.5418184336), (-25.4, -39.5418184336), align=None)
    extrude(amount=F3_T144_DEPTH)

    split(bisect_by=Plane(origin=(-9.1939383908, -16.779767946, -14.0368126434), x_dir=(0.8769857612, -0.4805163626, 0), z_dir=(-0.3874365964, -0.7071067812, -0.5915174416)), keep=Keep.TOP)


with BuildPart() as f1_29:
    add(f1_28.part)

    # F3_t141: cut F3_tool142
    add(f3_tool142.part, mode=Mode.SUBTRACT)


with BuildPart() as f3_tool147:
    # F3_s148 → F3_t149 (new body)
    with BuildSketch(Plane(origin=(-29.3549569097, 0, -70.1877905691), x_dir=(0, 1, 0), z_dir=(0.3858475139, 0, 0.9225625703))):
        Polygon((-25.4, -7.5711827057), (-20.32, -12.6511827057), (-25.4, -12.6511827057), align=None)
    extrude(amount=F3_T149_DEPTH)

    split(bisect_by=Plane(origin=(-15.2089895306, -16.4855913528, -6.3609244384), x_dir=(0.7349918349, -0.6780759564, 0), z_dir=(-0.6523502495, -0.7071067812, -0.2728353936)), keep=Keep.TOP)


with BuildPart() as f1_30:
    add(f1_29.part)

    # F3_t146: cut F3_tool147
    add(f3_tool147.part, mode=Mode.SUBTRACT)


solid = f1_30.part
